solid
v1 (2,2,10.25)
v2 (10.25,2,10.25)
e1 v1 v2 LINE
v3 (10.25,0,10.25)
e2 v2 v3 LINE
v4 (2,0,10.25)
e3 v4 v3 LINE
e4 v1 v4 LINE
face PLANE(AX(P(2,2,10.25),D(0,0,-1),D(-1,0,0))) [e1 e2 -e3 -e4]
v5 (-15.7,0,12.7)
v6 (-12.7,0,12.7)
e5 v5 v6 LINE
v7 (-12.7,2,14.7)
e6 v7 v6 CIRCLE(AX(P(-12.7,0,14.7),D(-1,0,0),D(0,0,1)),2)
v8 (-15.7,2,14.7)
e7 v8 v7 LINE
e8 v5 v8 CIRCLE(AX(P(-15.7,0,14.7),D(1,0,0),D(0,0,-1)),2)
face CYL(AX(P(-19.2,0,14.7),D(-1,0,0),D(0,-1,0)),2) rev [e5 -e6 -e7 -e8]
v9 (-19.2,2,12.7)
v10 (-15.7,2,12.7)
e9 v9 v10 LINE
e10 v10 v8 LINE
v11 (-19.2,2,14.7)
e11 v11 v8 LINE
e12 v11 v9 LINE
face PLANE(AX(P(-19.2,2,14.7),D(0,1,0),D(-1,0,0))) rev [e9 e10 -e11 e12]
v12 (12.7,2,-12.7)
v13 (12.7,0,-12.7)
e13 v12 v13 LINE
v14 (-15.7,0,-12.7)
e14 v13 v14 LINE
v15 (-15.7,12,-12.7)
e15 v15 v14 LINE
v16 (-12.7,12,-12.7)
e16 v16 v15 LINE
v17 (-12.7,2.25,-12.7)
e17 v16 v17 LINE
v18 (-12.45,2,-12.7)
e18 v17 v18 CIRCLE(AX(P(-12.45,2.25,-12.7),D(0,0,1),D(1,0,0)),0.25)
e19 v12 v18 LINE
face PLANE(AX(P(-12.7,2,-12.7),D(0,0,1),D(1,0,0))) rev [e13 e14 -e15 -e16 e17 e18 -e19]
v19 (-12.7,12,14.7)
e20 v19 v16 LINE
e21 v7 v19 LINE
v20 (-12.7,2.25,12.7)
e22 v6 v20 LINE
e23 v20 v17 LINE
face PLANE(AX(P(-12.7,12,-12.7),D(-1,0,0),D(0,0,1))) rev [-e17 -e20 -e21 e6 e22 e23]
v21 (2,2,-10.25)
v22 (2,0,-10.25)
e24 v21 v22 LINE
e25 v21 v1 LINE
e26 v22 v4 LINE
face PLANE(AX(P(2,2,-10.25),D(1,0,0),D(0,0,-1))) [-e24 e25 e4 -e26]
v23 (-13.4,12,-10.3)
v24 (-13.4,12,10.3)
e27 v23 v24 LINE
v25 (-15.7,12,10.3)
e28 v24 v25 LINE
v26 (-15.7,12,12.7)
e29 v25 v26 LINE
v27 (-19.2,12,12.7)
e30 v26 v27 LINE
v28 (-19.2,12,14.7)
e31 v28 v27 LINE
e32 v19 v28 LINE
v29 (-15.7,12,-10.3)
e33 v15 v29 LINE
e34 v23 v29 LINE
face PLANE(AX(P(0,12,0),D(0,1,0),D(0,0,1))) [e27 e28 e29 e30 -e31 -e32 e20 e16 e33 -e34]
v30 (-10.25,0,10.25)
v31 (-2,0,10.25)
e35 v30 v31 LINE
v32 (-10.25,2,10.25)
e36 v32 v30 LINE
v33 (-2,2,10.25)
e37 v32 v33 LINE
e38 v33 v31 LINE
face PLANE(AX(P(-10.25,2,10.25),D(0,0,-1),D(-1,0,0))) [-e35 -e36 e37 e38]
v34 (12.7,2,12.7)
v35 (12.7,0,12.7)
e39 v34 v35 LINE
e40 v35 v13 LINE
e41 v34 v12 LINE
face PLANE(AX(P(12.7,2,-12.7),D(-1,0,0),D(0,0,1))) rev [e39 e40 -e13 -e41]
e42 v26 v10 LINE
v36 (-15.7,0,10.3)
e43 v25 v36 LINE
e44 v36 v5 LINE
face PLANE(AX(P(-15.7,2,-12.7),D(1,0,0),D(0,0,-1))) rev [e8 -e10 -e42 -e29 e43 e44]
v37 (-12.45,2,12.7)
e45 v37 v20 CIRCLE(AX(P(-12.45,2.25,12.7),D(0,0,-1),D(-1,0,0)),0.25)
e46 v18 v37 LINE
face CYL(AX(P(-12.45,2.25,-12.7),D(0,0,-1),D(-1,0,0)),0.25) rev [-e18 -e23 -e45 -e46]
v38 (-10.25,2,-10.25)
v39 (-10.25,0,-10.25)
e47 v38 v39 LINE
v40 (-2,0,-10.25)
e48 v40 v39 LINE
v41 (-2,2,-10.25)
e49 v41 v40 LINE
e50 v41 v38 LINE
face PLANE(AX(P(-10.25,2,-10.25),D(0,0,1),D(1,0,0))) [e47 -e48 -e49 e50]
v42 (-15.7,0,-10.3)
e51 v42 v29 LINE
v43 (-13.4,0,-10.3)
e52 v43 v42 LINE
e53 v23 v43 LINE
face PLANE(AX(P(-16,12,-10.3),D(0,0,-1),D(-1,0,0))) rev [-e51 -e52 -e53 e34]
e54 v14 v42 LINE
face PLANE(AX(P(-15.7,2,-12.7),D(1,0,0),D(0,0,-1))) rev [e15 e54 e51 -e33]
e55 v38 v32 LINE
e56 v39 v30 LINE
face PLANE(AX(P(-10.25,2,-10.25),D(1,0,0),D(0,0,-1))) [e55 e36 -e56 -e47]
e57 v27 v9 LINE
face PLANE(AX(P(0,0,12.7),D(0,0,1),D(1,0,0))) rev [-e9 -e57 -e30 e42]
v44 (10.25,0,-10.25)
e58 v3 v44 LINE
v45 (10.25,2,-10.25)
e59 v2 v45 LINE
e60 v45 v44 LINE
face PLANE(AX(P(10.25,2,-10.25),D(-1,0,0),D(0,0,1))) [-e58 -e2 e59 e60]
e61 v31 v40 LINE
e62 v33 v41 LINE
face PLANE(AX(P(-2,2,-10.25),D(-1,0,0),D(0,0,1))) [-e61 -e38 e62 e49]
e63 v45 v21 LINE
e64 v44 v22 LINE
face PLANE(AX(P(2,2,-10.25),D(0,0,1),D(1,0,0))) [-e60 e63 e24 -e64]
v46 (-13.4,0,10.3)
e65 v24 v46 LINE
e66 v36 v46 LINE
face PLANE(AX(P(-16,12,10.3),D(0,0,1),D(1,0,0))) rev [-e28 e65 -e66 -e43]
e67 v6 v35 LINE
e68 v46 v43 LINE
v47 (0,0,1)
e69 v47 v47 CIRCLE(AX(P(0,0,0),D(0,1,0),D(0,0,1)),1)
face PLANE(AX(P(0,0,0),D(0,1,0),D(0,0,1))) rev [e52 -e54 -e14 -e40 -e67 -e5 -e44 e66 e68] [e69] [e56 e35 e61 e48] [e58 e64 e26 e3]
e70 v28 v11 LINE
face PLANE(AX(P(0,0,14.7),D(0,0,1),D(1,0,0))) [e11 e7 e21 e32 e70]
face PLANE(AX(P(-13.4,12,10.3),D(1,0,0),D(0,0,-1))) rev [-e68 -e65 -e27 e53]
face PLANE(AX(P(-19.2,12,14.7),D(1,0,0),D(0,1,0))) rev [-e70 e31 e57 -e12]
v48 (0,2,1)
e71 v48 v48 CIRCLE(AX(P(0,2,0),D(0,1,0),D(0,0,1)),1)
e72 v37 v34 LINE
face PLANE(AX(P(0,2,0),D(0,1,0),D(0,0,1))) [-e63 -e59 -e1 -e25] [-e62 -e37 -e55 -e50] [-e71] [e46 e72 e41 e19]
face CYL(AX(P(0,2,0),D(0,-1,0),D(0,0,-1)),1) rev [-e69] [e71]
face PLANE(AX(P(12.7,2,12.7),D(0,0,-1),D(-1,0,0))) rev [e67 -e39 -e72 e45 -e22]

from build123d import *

# Parameters (mm, degrees)
SKETCH2_R               = 1
SKETCH2_W               = 8.25
SKETCH2_H               = 20.5
BOSS_EXTRUDE1_DEPTH     = 2
SKETCH3_W               = 3
SKETCH3_H               = 25.4
BOSS_EXTRUDE2_DEPTH     = 10
FILLET1_R               = 0.25
SKETCH5_W               = 6.5
SKETCH5_H               = 10
BOSS_EXTRUDE3_DEPTH     = 2
CUT_EXTRUDE1_DEPTH      = 27.994999537
CUT_EXTRUDE1_DEPTH_BACK = 27.994999537
SKETCH6_W               = 2.6
SKETCH6_H               = 20.6
FILLET3_R               = 2


with BuildPart() as part:
    # Sketch2 → Boss-Extrude1 (new body)
    with BuildSketch(Plane(origin=(0, 0, 0), x_dir=(1, 0, 0), z_dir=(0, 1, 0))):
        Polygon((-12.7, 12.7), (-15.7, 12.7), (-15.7, -12.7), (-12.7, -12.7), (12.7, -12.7), (12.7, 12.7), align=None)
        with Locations(Location((0, 0, 0), (0, 0, 270))):
            Circle(SKETCH2_R, mode=Mode.SUBTRACT)
        with Locations((6.125, 0)):
            Rectangle(SKETCH2_W, SKETCH2_H, mode=Mode.SUBTRACT)
        with Locations((-6.125, 0)):
            Rectangle(SKETCH2_W, SKETCH2_H, mode=Mode.SUBTRACT)
    extrude(amount=BOSS_EXTRUDE1_DEPTH)

    # Sketch3 → Boss-Extrude2 (add)
    with BuildSketch(Plane(origin=(0, 2, 0), x_dir=(1, 0, 0), z_dir=(0, 1, 0))):
        with Locations((-14.2, 0)):
            Rectangle(SKETCH3_W, SKETCH3_H)
    extrude(amount=BOSS_EXTRUDE2_DEPTH)

    # Fillet1
    fillet1_edges = [part.edges().sort_by_distance(p)[0] for p in [
        (-12.7, 2, 0),
    ]]
    fillet(fillet1_edges, radius=FILLET1_R)

    # Sketch5 → Boss-Extrude3 (add)
    with BuildSketch(Plane.XY.offset(12.7)):
        with Locations((-15.95, 7)):
            Rectangle(SKETCH5_W, SKETCH5_H)
    extrude(amount=BOSS_EXTRUDE3_DEPTH)

    # Sketch6 → Cut-Extrude1 (cut, two sides: drawn at the far end of the back side and taken through both)
    with BuildSketch(Plane.XZ.offset(-CUT_EXTRUDE1_DEPTH_BACK)):
        with Locations((-14.7, 0)):
            Rectangle(SKETCH6_W, SKETCH6_H)
    extrude(amount=CUT_EXTRUDE1_DEPTH + CUT_EXTRUDE1_DEPTH_BACK, mode=Mode.SUBTRACT)

    # Fillet3
    fillet3_edges = [part.edges().sort_by_distance(p)[0] for p in [
        (-14.2, 2, 12.7),
    ]]
    fillet(fillet3_edges, radius=FILLET3_R - 0.0001)  # a hair under: the kernel refuses the full size


solid = part.part
